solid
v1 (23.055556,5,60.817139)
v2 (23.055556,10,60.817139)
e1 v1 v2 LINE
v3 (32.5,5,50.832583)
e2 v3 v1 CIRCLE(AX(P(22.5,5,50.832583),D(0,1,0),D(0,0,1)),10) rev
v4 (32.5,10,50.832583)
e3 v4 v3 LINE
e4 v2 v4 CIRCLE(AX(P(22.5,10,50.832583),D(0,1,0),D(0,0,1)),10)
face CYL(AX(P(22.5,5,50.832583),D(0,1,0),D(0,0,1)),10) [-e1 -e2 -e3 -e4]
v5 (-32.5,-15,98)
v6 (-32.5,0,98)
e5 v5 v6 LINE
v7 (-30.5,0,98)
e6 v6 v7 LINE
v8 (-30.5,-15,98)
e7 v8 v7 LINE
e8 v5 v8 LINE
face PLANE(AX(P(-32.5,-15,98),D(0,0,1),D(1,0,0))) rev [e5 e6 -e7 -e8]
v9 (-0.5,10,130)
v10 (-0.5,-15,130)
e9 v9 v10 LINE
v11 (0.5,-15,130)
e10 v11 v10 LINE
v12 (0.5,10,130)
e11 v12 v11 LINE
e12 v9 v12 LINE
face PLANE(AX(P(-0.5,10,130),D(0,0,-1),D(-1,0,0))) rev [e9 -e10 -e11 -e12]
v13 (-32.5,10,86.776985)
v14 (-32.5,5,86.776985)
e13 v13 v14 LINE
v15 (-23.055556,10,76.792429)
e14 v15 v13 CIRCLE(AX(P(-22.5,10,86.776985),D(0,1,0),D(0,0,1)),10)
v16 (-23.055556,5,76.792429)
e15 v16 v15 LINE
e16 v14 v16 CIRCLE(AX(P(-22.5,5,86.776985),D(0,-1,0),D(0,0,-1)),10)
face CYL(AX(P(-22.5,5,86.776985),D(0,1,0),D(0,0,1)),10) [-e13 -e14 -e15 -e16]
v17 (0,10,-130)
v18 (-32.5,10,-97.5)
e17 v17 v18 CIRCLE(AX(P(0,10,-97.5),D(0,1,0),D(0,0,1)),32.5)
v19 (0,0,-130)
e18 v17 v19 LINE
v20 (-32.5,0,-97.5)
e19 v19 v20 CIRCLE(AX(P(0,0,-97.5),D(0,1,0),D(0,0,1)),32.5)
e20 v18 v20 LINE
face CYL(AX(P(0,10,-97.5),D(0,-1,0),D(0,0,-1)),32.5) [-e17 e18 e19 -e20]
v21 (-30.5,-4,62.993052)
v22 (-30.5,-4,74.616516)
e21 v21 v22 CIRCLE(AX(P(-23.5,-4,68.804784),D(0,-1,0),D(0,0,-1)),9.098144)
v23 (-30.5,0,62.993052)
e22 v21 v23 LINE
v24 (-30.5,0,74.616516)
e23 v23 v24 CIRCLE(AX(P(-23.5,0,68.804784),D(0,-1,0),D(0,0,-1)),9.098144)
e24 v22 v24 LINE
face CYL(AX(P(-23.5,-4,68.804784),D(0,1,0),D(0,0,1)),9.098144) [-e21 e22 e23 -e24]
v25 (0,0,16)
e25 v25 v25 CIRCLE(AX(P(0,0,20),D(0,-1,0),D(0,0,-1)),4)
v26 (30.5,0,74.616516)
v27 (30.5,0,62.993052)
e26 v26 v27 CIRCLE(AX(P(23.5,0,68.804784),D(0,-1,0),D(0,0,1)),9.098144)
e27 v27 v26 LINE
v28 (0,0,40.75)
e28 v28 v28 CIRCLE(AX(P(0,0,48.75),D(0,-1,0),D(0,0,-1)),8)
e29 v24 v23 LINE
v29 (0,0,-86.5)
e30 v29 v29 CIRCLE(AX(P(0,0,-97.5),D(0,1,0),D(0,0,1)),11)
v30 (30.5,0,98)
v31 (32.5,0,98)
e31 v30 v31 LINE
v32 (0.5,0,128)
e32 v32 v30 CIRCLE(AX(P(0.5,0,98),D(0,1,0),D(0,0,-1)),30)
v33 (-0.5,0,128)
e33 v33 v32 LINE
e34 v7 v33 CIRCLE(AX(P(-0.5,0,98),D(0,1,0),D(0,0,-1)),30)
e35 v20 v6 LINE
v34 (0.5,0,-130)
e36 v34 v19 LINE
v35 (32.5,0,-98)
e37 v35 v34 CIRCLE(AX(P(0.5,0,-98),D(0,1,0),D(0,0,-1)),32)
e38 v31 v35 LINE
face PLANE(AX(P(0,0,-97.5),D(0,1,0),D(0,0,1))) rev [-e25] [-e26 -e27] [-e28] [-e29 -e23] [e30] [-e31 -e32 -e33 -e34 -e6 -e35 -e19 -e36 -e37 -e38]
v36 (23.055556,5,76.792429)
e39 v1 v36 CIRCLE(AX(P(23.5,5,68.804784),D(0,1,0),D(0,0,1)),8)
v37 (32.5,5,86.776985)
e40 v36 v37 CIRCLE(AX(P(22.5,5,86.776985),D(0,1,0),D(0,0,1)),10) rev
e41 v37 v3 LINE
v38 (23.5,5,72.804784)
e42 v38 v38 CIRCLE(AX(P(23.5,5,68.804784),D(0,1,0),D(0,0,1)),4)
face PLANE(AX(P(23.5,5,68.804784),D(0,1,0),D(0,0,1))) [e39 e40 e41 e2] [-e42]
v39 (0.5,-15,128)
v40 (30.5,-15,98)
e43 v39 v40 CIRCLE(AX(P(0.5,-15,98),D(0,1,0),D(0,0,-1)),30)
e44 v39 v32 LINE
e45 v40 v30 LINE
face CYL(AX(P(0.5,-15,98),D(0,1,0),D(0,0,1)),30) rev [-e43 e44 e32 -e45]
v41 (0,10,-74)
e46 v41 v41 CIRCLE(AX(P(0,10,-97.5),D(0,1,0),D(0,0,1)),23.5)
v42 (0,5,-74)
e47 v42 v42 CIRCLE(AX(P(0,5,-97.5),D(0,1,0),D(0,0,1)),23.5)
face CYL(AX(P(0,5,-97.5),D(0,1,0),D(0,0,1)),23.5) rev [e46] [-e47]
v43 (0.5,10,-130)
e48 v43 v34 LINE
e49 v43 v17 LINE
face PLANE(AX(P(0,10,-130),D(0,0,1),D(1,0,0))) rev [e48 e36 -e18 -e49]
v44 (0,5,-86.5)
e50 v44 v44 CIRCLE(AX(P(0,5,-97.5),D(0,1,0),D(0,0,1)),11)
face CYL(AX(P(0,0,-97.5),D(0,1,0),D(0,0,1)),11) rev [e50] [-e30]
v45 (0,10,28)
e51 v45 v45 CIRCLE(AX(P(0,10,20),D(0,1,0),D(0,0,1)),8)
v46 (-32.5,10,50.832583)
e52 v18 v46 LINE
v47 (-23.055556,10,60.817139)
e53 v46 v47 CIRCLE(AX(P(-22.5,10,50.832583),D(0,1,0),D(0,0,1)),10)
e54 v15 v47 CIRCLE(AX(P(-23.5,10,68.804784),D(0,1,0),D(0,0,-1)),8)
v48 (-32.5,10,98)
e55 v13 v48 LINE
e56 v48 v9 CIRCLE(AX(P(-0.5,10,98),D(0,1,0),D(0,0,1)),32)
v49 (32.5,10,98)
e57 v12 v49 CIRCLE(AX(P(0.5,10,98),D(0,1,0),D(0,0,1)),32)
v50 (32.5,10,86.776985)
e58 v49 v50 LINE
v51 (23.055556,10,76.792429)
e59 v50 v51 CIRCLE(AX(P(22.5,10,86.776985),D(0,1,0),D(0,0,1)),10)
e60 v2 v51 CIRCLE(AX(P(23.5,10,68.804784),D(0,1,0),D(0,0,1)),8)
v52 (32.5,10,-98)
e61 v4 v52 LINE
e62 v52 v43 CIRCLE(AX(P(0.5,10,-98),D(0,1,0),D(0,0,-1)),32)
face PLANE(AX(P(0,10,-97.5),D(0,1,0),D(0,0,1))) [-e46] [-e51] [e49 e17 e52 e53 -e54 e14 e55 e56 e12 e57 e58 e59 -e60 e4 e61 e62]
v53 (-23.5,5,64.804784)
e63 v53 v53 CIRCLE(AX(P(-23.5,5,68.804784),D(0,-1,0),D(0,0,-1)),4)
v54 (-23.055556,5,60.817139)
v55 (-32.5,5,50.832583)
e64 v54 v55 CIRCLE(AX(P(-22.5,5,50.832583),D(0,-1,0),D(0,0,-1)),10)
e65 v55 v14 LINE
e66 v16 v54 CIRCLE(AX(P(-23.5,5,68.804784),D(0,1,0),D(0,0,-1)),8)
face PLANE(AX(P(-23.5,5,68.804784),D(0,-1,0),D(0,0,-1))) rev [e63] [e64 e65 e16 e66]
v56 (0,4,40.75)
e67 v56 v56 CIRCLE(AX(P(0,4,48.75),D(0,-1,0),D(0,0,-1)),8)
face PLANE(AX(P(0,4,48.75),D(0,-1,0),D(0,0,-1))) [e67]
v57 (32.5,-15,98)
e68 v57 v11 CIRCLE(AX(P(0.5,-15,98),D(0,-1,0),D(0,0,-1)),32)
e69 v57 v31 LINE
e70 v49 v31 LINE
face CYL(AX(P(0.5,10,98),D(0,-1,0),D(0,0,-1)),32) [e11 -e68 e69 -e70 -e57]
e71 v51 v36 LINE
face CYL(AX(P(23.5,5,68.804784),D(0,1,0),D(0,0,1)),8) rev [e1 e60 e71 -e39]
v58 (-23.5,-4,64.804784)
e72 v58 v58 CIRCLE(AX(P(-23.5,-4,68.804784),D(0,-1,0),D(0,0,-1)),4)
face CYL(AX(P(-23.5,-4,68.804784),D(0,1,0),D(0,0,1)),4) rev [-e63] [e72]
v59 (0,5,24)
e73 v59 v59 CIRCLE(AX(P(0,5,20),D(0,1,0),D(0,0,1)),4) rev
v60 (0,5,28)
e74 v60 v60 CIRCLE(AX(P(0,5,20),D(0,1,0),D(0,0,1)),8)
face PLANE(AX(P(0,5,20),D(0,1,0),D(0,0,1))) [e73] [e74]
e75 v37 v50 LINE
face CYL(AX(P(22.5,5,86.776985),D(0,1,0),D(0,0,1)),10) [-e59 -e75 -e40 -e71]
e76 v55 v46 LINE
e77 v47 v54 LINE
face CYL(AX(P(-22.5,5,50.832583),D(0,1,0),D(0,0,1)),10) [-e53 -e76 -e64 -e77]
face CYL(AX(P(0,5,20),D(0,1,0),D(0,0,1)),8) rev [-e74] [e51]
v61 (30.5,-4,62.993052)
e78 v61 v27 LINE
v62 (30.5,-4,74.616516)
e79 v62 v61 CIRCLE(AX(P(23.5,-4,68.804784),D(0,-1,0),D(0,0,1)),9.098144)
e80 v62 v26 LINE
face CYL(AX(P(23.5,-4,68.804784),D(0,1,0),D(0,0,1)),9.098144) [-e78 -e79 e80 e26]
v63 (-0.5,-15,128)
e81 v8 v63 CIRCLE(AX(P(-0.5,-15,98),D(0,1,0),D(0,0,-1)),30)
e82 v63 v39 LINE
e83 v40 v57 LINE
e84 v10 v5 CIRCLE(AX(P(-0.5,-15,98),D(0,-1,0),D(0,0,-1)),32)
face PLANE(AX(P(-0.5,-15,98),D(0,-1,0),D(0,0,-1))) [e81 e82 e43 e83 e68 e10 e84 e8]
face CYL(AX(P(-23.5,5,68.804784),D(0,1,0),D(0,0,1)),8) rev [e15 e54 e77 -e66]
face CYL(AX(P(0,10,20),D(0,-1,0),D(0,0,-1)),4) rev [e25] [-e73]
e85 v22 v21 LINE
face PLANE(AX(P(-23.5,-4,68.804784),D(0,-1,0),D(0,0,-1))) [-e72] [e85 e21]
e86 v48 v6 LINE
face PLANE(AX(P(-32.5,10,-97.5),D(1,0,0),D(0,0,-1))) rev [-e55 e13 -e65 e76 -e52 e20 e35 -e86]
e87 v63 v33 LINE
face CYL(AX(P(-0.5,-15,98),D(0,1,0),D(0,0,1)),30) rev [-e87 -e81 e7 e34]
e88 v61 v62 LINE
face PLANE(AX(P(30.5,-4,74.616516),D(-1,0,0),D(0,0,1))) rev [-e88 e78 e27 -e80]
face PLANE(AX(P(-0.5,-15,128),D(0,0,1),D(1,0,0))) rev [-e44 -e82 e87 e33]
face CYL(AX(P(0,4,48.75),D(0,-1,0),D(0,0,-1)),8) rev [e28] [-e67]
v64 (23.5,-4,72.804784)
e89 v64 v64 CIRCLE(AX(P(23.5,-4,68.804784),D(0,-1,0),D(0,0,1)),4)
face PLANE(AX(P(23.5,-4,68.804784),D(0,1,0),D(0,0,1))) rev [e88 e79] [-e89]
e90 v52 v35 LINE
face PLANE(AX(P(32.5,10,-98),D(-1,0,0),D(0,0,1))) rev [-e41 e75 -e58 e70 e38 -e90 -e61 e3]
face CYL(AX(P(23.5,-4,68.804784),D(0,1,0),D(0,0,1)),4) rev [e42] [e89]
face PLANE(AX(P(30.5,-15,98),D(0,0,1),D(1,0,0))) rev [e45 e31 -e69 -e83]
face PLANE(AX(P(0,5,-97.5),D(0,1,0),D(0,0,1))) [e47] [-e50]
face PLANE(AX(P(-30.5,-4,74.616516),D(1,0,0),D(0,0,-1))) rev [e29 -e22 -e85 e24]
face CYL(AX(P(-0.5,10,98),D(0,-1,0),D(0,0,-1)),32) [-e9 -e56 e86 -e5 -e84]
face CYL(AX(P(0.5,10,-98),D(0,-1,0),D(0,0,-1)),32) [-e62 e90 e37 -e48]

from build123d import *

# Parameters (mm, degrees)
BOSS_EXTRUDE1_DEPTH = 10
SKETCH2_R           = 23.5
CUT_EXTRUDE1_DEPTH  = 5
SKETCH3_R           = 11
CUT_EXTRUDE2_DEPTH  = 135.094183319
SKETCH22_R          = 8
CUT_EXTRUDE15_DEPTH = 4
SKETCH23_R          = 4
BOSS_EXTRUDE6_DEPTH = 4
SKETCH24_R          = 4
CUT_EXTRUDE16_DEPTH = 135.373546504
BOSS_EXTRUDE7_START = 15
BOSS_EXTRUDE7_DEPTH = 15
SKETCH26_R          = 8
CUT_EXTRUDE17_DEPTH = 5
FILLET1_R           = 10
FILLET2_R           = 10


with BuildPart() as part:
    # Sketch1 → Boss-Extrude1 (new body)
    with BuildSketch(Plane(origin=(0, 0, 0), x_dir=(1, 0, 0), z_dir=(0, 1, 0))):
        with BuildLine():
            Line((0, 130), (0.5, 130))
            ThreePointArc((0.5, 130), (23.127416998, 120.627416998), (32.5, 98))
            Line((32.5, 98), (32.5, -98))
            ThreePointArc((32.5, -98), (23.127416998, -120.627416998), (0.5, -130))
            Line((0.5, -130), (-0.5, -130))
            ThreePointArc((-0.5, -130), (-23.127416998, -120.627416998), (-32.5, -98))
            Line((-32.5, -98), (-32.5, 97.5))
            ThreePointArc((-32.5, 97.5), (-22.980970389, 120.480970389), (0, 130))
        make_face()
    extrude(amount=BOSS_EXTRUDE1_DEPTH)

    # Sketch2 → Cut-Extrude1 (cut)
    with BuildSketch(Plane(origin=(0, 10, 0), x_dir=(1, 0, 0), z_dir=(0, 1, 0))):
        with Locations(Location((0, 97.5, 0), (0, 0, 270))):
            Circle(SKETCH2_R)
    extrude(amount=-CUT_EXTRUDE1_DEPTH, mode=Mode.SUBTRACT)

    # Sketch3 → Cut-Extrude2 (cut, through all)
    with BuildSketch(Plane(origin=(0, 5, 0), x_dir=(1, 0, 0), z_dir=(0, 1, 0))):
        with Locations(Location((0, 97.5, 0), (0, 0, 270))):
            Circle(SKETCH3_R)
    extrude(amount=-CUT_EXTRUDE2_DEPTH, mode=Mode.SUBTRACT)

    # Sketch22 → Cut-Extrude15 (cut)
    with BuildSketch(Plane.XZ):
        with Locations(Location((0, 48.75, 0), (0, 0, 270))):
            Circle(SKETCH22_R)
    extrude(amount=-CUT_EXTRUDE15_DEPTH, mode=Mode.SUBTRACT)

    # Sketch23 → Boss-Extrude6 (add)
    # profile 1 of 2: a face of its own
    with BuildSketch(Plane.XZ):
        with BuildLine():
            Line((-30.5, 74.616516124), (-30.5, 62.993052049))
            ThreePointArc((-30.5, 62.993052049), (-14.401855723, 68.804784086), (-30.5, 74.616516124))
        make_face()
        with Locations(Location((-23.5, 68.804784086, 0), (0, 0, 270))):
            Circle(SKETCH23_R, mode=Mode.SUBTRACT)
    # profile 2 of 2: a face of its own
    with BuildSketch(Plane.XZ):
        with BuildLine():
            Line((30.5, 74.616516124), (30.5, 62.993052049))
            ThreePointArc((30.5, 62.993052049), (14.401855723, 68.804784086), (30.5, 74.616516124))
        make_face()
        with Locations(Location((23.5, 68.804784086, 0), (0, 0, 90))):
            Circle(SKETCH23_R, mode=Mode.SUBTRACT)
    extrude(amount=BOSS_EXTRUDE6_DEPTH)

    # Sketch24 → Cut-Extrude16 (cut, through all)
    with BuildSketch(Plane.XZ):
        with Locations(Location((0, 20, 0), (0, 0, 270))):
            Circle(SKETCH24_R)
        with Locations(Location((-23.5, 68.804784086, 0), (0, 0, 270))):
            Circle(SKETCH24_R)
        with Locations(Location((23.5, 68.804784086, 0), (0, 0, 90))):
            Circle(SKETCH24_R)
    extrude(amount=-CUT_EXTRUDE16_DEPTH, mode=Mode.SUBTRACT)

    # Sketch25 → Boss-Extrude7 (add)
    with BuildSketch(Plane.XZ.offset(BOSS_EXTRUDE7_START)):
        with BuildLine():
            Line((-32.5, 98), (-30.5, 98))
            ThreePointArc((-30.5, 98), (-21.713203436, 119.213203436), (-0.5, 128))
            Line((-0.5, 128), (0.5, 128))
            ThreePointArc((0.5, 128), (21.713203436, 119.213203436), (30.5, 98))
            Line((30.5, 98), (32.5, 98))
            ThreePointArc((32.5, 98), (23.127416998, 120.627416998), (0.5, 130))
            Line((0.5, 130), (-0.5, 130))
            ThreePointArc((-0.5, 130), (-23.127416998, 120.627416998), (-32.5, 98))
        make_face()
    extrude(amount=-BOSS_EXTRUDE7_DEPTH)

    # Sketch26 → Cut-Extrude17 (cut)
    with BuildSketch(Plane(origin=(0, 10, 0), x_dir=(1, 0, 0), z_dir=(0, 1, 0))):
        with Locations(Location((0, -20, 0), (0, 0, 270))):
            Circle(SKETCH26_R)
        with BuildLine():
            Line((-23.5, -60.804784086), (-32.5, -60.804784086))
            Line((-32.5, -60.804784086), (-32.5, -76.804784086))
            Line((-32.5, -76.804784086), (-23.5, -76.804784086))
            ThreePointArc((-23.5, -76.804784086), (-15.5, -68.804784086), (-23.5, -60.804784086))
        make_face()
        with BuildLine():
            Line((23.5, -60.804784086), (32.5, -60.804784086))
            Line((32.5, -60.804784086), (32.5, -76.804784086))
            Line((32.5, -76.804784086), (23.5, -76.804784086))
            ThreePointArc((23.5, -76.804784086), (15.5, -68.804784086), (23.5, -60.804784086))
        make_face()
    extrude(amount=-CUT_EXTRUDE17_DEPTH, mode=Mode.SUBTRACT)

    # Fillet1
    # the kernel refuses this fillet: 10 mm, written as the material it takes off along each edge
    with BuildSketch(Plane(origin=(-32.5, 34.930501889, 76.804784086), x_dir=(0, 0, 1), z_dir=(0, -1, 0))) as fillet1_piece_1:
        with BuildLine():
            CenterArc((9.972200756, -10), FILLET1_R, 90, 86.815261463)
            Line((-0.01235522, -9.444444444), (-1.010810817, -9.388888889))
            ThreePointArc((-1.010810817, -9.388888889), (-1, -9), (-1, 0))
            Line((-1, 0), (0, 1))
            Line((0, 1), (9.972200756, 1))
            Line((9.972200756, 1), (9.972200756, 0))
        make_face()
    extrude(amount=29.930501889, mode=Mode.SUBTRACT)
    with BuildSketch(Plane(origin=(-32.5, 34.930501889, 60.804784086), x_dir=(0, 0, -1), z_dir=(0, -1, 0))) as fillet1_piece_2:
        with BuildLine():
            CenterArc((9.972200756, 10), FILLET1_R, 183.184738537, 86.815261463)
            Line((-0.01235522, 9.444444444), (-1.010810817, 9.388888889))
            ThreePointArc((-1.010810817, 9.388888889), (-1, 9), (-1, 0))
            Line((-1, 0), (0, -1))
            Line((0, -1), (9.972200756, -1))
            Line((9.972200756, -1), (9.972200756, 0))
        make_face()
    extrude(amount=29.930501889, mode=Mode.SUBTRACT)

    # Fillet2
    # the kernel refuses this fillet: 10 mm, written as the material it takes off along each edge
    with BuildSketch(Plane(origin=(32.5, 34.930501889, 76.804784086), x_dir=(0, 0, 1), z_dir=(0, -1, 0))) as fillet2_piece_1:
        with BuildLine():
            CenterArc((9.972200756, 10), FILLET2_R, 183.184738537, 86.815261463)
            Line((-0.01235522, 9.444444444), (-1.010810817, 9.388888889))
            ThreePointArc((-1.010810817, 9.388888889), (-1, 9), (-1, 0))
            Line((-1, 0), (0, -1))
            Line((0, -1), (9.972200756, -1))
            Line((9.972200756, -1), (9.972200756, 0))
        make_face()
    extrude(amount=29.930501889, mode=Mode.SUBTRACT)
    with BuildSketch(Plane(origin=(32.5, 34.930501889, 60.804784086), x_dir=(0, 0, -1), z_dir=(0, -1, 0))) as fillet2_piece_2:
        with BuildLine():
            CenterArc((9.972200756, -10), FILLET2_R, 90, 86.815261463)
            Line((-0.01235522, -9.444444444), (-1.010810817, -9.388888889))
            ThreePointArc((-1.010810817, -9.388888889), (-1, -9), (-1, 0))
            Line((-1, 0), (0, 1))
            Line((0, 1), (9.972200756, 1))
            Line((9.972200756, 1), (9.972200756, 0))
        make_face()
    extrude(amount=29.930501889, mode=Mode.SUBTRACT)


solid = part.part
